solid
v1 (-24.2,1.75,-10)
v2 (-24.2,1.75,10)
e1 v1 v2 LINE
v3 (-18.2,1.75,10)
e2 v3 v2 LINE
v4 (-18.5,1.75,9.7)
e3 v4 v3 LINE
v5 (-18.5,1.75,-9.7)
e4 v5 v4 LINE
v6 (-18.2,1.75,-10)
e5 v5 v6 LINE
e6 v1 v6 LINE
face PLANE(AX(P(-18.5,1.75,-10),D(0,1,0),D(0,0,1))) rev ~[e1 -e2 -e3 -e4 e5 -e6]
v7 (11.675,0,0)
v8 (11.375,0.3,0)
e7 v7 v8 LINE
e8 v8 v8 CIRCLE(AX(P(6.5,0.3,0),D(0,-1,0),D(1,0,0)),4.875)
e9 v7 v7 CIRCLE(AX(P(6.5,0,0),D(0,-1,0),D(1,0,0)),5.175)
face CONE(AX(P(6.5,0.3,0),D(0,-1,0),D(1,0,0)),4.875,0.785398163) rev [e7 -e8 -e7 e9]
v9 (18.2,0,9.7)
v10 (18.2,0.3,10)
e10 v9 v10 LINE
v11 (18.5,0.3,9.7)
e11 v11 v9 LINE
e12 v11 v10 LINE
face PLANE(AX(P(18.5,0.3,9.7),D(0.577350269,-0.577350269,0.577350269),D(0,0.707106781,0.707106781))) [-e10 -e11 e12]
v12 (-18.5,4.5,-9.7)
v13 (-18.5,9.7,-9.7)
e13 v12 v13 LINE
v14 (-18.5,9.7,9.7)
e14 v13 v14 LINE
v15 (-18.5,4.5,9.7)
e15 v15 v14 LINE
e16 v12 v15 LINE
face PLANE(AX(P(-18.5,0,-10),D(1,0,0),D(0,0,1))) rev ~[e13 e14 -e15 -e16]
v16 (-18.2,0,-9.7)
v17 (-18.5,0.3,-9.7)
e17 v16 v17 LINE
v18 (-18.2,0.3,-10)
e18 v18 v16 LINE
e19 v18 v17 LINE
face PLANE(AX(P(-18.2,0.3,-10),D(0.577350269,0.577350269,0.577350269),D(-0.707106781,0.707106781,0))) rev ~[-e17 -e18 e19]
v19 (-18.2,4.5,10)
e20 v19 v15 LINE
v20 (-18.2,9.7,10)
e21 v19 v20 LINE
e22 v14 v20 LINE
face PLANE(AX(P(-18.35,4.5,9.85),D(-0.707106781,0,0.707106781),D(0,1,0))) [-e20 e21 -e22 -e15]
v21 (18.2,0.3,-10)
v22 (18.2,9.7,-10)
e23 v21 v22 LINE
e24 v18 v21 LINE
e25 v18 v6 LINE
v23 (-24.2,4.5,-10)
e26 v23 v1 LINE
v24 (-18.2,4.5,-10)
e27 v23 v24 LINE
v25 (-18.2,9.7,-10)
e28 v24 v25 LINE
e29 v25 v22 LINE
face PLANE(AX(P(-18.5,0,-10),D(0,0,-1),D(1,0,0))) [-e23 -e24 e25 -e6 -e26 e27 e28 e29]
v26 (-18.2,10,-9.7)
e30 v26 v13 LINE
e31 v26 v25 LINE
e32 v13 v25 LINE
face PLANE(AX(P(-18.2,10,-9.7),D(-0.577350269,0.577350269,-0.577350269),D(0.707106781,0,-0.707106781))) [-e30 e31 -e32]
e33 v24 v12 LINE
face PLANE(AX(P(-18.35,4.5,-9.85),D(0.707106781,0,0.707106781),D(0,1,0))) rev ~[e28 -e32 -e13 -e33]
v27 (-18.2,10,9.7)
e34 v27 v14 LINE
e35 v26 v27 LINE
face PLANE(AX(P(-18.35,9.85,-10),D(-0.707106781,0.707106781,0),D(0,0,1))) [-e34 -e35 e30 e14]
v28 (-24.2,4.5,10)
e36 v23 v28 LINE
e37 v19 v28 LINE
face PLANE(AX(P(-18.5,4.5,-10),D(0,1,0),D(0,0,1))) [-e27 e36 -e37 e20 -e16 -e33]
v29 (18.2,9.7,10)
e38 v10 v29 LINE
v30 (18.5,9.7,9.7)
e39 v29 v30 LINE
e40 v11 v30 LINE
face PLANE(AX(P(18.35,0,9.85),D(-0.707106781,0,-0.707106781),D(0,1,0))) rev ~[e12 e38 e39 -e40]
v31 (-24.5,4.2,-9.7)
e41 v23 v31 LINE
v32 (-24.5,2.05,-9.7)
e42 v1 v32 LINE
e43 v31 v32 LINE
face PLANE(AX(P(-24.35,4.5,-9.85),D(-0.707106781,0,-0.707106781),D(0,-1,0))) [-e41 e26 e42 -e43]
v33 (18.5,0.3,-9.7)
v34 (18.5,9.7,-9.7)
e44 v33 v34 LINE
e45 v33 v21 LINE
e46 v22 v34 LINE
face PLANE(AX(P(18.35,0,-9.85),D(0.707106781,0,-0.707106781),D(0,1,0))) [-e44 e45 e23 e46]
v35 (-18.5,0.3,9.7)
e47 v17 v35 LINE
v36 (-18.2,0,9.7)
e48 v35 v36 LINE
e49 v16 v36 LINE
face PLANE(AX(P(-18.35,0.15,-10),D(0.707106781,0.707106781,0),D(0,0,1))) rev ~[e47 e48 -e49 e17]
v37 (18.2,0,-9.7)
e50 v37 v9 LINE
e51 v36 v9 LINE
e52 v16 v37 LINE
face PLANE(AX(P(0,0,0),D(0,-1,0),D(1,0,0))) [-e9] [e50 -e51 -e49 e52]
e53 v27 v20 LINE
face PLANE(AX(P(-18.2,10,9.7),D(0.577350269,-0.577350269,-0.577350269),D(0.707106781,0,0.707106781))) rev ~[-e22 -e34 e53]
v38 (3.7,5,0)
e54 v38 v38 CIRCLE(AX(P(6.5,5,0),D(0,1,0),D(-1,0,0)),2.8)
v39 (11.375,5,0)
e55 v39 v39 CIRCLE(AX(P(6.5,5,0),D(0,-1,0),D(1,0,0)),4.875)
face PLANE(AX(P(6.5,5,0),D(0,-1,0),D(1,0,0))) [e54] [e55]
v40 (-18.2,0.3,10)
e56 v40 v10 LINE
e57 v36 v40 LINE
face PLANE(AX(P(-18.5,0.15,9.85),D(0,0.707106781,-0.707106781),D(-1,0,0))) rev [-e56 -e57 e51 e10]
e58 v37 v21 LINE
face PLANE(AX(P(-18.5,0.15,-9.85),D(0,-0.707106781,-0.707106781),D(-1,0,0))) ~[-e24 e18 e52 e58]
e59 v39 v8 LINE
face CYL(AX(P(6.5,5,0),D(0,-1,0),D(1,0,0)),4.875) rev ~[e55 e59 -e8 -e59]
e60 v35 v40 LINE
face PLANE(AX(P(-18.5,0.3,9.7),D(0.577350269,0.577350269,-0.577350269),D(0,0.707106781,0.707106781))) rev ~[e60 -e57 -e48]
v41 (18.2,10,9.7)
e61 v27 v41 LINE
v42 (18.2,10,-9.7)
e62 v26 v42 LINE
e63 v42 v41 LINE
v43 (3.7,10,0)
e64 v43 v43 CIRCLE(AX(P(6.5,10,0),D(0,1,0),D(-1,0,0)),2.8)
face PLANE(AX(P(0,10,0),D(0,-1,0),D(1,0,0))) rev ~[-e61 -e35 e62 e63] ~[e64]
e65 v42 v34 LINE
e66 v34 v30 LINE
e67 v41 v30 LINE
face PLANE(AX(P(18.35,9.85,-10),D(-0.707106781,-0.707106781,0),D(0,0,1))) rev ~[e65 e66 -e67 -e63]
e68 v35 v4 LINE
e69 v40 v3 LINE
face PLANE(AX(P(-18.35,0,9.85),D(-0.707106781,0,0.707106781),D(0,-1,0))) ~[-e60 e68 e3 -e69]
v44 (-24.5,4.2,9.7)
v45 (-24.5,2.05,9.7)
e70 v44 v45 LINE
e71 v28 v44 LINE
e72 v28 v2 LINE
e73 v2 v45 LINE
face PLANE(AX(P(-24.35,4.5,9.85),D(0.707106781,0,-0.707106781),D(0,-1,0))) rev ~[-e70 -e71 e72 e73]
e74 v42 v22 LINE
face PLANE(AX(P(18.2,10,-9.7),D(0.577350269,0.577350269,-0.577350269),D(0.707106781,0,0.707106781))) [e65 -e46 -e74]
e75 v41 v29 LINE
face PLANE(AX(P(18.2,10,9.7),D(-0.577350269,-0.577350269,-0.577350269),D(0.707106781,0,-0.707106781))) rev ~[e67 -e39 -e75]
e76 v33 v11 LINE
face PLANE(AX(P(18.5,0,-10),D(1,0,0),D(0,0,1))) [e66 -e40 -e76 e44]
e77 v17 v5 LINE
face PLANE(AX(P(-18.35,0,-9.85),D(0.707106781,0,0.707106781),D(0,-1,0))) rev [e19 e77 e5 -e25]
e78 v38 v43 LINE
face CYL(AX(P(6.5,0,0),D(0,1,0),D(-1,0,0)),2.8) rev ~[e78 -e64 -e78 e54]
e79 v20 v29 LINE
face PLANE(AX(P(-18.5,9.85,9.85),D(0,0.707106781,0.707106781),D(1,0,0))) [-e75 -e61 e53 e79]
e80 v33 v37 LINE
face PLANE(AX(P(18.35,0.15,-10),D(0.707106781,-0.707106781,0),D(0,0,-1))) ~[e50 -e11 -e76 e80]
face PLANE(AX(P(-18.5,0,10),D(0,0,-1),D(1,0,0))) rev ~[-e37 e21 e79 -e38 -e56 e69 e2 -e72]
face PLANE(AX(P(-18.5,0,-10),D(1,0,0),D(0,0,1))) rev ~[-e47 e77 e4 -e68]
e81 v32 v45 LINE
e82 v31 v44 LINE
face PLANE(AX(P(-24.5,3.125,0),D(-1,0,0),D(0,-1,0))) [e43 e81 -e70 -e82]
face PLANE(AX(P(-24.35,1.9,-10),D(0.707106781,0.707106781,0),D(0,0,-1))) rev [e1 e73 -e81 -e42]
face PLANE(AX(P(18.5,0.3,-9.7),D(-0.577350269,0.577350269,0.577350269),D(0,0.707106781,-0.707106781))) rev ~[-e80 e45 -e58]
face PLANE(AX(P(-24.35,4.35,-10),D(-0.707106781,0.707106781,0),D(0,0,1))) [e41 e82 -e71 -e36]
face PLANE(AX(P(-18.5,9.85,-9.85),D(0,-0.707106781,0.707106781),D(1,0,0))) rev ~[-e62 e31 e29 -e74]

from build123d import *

# Parameters (mm, degrees)
F0_W           = 37
F0_H           = 20
F1_DEPTH       = 10
F2_D           = 5.6
F2_CBORE_D     = 9.75
F2_CBORE_DEPTH = 5
F3_W           = 2.75
F3_H           = 20
F4_DEPTH       = 6
F5_SIZE        = 0.3


with BuildPart() as f1:
    # F0 (on Front) → F1 (new body)
    with BuildSketch(Plane.XZ):
        Rectangle(F0_W, F0_H)
    extrude(amount=-F1_DEPTH)

    # F2 (through all)
    with Locations(Plane.XZ):
        with Locations((6.5, 0)):
            CounterBoreHole(F2_D / 2, F2_CBORE_D / 2, F2_CBORE_DEPTH)

    # F3 (on face) → F4 (join)
    with BuildSketch(Plane(origin=(-18.5, 0, 0), x_dir=(0, -1, 0), z_dir=(-1, 0, 0))):
        with Locations((-3.125, 0)):
            Rectangle(F3_W, F3_H)
    extrude(amount=F4_DEPTH)

    # F5
    f5_edges = [f1.edges().sort_by_distance(p)[0] for p in [
        (0, 0, 10),
        (-18.5, 0, 0),
        (0, 0, -10),
        (18.5, 0, 0),
        (18.5, 5, -10),
        (18.5, 5, 10),
        (-18.5, 0.875, -10),
        (-18.5, 7.25, -10),
        (-24.5, 3.125, -10),
        (-24.5, 3.125, 10),
        (-18.5, 0.875, 10),
        (-18.5, 7.25, 10),
        (-24.5, 1.75, 0),
        (-24.5, 4.5, 0),
        (-18.5, 10, 0),
        (0, 10, 10),
        (0, 10, -10),
        (18.5, 10, 0),
        (1.625, 0, 0),
    ]]
    chamfer(f5_edges, length=F5_SIZE)


solid = f1.part
